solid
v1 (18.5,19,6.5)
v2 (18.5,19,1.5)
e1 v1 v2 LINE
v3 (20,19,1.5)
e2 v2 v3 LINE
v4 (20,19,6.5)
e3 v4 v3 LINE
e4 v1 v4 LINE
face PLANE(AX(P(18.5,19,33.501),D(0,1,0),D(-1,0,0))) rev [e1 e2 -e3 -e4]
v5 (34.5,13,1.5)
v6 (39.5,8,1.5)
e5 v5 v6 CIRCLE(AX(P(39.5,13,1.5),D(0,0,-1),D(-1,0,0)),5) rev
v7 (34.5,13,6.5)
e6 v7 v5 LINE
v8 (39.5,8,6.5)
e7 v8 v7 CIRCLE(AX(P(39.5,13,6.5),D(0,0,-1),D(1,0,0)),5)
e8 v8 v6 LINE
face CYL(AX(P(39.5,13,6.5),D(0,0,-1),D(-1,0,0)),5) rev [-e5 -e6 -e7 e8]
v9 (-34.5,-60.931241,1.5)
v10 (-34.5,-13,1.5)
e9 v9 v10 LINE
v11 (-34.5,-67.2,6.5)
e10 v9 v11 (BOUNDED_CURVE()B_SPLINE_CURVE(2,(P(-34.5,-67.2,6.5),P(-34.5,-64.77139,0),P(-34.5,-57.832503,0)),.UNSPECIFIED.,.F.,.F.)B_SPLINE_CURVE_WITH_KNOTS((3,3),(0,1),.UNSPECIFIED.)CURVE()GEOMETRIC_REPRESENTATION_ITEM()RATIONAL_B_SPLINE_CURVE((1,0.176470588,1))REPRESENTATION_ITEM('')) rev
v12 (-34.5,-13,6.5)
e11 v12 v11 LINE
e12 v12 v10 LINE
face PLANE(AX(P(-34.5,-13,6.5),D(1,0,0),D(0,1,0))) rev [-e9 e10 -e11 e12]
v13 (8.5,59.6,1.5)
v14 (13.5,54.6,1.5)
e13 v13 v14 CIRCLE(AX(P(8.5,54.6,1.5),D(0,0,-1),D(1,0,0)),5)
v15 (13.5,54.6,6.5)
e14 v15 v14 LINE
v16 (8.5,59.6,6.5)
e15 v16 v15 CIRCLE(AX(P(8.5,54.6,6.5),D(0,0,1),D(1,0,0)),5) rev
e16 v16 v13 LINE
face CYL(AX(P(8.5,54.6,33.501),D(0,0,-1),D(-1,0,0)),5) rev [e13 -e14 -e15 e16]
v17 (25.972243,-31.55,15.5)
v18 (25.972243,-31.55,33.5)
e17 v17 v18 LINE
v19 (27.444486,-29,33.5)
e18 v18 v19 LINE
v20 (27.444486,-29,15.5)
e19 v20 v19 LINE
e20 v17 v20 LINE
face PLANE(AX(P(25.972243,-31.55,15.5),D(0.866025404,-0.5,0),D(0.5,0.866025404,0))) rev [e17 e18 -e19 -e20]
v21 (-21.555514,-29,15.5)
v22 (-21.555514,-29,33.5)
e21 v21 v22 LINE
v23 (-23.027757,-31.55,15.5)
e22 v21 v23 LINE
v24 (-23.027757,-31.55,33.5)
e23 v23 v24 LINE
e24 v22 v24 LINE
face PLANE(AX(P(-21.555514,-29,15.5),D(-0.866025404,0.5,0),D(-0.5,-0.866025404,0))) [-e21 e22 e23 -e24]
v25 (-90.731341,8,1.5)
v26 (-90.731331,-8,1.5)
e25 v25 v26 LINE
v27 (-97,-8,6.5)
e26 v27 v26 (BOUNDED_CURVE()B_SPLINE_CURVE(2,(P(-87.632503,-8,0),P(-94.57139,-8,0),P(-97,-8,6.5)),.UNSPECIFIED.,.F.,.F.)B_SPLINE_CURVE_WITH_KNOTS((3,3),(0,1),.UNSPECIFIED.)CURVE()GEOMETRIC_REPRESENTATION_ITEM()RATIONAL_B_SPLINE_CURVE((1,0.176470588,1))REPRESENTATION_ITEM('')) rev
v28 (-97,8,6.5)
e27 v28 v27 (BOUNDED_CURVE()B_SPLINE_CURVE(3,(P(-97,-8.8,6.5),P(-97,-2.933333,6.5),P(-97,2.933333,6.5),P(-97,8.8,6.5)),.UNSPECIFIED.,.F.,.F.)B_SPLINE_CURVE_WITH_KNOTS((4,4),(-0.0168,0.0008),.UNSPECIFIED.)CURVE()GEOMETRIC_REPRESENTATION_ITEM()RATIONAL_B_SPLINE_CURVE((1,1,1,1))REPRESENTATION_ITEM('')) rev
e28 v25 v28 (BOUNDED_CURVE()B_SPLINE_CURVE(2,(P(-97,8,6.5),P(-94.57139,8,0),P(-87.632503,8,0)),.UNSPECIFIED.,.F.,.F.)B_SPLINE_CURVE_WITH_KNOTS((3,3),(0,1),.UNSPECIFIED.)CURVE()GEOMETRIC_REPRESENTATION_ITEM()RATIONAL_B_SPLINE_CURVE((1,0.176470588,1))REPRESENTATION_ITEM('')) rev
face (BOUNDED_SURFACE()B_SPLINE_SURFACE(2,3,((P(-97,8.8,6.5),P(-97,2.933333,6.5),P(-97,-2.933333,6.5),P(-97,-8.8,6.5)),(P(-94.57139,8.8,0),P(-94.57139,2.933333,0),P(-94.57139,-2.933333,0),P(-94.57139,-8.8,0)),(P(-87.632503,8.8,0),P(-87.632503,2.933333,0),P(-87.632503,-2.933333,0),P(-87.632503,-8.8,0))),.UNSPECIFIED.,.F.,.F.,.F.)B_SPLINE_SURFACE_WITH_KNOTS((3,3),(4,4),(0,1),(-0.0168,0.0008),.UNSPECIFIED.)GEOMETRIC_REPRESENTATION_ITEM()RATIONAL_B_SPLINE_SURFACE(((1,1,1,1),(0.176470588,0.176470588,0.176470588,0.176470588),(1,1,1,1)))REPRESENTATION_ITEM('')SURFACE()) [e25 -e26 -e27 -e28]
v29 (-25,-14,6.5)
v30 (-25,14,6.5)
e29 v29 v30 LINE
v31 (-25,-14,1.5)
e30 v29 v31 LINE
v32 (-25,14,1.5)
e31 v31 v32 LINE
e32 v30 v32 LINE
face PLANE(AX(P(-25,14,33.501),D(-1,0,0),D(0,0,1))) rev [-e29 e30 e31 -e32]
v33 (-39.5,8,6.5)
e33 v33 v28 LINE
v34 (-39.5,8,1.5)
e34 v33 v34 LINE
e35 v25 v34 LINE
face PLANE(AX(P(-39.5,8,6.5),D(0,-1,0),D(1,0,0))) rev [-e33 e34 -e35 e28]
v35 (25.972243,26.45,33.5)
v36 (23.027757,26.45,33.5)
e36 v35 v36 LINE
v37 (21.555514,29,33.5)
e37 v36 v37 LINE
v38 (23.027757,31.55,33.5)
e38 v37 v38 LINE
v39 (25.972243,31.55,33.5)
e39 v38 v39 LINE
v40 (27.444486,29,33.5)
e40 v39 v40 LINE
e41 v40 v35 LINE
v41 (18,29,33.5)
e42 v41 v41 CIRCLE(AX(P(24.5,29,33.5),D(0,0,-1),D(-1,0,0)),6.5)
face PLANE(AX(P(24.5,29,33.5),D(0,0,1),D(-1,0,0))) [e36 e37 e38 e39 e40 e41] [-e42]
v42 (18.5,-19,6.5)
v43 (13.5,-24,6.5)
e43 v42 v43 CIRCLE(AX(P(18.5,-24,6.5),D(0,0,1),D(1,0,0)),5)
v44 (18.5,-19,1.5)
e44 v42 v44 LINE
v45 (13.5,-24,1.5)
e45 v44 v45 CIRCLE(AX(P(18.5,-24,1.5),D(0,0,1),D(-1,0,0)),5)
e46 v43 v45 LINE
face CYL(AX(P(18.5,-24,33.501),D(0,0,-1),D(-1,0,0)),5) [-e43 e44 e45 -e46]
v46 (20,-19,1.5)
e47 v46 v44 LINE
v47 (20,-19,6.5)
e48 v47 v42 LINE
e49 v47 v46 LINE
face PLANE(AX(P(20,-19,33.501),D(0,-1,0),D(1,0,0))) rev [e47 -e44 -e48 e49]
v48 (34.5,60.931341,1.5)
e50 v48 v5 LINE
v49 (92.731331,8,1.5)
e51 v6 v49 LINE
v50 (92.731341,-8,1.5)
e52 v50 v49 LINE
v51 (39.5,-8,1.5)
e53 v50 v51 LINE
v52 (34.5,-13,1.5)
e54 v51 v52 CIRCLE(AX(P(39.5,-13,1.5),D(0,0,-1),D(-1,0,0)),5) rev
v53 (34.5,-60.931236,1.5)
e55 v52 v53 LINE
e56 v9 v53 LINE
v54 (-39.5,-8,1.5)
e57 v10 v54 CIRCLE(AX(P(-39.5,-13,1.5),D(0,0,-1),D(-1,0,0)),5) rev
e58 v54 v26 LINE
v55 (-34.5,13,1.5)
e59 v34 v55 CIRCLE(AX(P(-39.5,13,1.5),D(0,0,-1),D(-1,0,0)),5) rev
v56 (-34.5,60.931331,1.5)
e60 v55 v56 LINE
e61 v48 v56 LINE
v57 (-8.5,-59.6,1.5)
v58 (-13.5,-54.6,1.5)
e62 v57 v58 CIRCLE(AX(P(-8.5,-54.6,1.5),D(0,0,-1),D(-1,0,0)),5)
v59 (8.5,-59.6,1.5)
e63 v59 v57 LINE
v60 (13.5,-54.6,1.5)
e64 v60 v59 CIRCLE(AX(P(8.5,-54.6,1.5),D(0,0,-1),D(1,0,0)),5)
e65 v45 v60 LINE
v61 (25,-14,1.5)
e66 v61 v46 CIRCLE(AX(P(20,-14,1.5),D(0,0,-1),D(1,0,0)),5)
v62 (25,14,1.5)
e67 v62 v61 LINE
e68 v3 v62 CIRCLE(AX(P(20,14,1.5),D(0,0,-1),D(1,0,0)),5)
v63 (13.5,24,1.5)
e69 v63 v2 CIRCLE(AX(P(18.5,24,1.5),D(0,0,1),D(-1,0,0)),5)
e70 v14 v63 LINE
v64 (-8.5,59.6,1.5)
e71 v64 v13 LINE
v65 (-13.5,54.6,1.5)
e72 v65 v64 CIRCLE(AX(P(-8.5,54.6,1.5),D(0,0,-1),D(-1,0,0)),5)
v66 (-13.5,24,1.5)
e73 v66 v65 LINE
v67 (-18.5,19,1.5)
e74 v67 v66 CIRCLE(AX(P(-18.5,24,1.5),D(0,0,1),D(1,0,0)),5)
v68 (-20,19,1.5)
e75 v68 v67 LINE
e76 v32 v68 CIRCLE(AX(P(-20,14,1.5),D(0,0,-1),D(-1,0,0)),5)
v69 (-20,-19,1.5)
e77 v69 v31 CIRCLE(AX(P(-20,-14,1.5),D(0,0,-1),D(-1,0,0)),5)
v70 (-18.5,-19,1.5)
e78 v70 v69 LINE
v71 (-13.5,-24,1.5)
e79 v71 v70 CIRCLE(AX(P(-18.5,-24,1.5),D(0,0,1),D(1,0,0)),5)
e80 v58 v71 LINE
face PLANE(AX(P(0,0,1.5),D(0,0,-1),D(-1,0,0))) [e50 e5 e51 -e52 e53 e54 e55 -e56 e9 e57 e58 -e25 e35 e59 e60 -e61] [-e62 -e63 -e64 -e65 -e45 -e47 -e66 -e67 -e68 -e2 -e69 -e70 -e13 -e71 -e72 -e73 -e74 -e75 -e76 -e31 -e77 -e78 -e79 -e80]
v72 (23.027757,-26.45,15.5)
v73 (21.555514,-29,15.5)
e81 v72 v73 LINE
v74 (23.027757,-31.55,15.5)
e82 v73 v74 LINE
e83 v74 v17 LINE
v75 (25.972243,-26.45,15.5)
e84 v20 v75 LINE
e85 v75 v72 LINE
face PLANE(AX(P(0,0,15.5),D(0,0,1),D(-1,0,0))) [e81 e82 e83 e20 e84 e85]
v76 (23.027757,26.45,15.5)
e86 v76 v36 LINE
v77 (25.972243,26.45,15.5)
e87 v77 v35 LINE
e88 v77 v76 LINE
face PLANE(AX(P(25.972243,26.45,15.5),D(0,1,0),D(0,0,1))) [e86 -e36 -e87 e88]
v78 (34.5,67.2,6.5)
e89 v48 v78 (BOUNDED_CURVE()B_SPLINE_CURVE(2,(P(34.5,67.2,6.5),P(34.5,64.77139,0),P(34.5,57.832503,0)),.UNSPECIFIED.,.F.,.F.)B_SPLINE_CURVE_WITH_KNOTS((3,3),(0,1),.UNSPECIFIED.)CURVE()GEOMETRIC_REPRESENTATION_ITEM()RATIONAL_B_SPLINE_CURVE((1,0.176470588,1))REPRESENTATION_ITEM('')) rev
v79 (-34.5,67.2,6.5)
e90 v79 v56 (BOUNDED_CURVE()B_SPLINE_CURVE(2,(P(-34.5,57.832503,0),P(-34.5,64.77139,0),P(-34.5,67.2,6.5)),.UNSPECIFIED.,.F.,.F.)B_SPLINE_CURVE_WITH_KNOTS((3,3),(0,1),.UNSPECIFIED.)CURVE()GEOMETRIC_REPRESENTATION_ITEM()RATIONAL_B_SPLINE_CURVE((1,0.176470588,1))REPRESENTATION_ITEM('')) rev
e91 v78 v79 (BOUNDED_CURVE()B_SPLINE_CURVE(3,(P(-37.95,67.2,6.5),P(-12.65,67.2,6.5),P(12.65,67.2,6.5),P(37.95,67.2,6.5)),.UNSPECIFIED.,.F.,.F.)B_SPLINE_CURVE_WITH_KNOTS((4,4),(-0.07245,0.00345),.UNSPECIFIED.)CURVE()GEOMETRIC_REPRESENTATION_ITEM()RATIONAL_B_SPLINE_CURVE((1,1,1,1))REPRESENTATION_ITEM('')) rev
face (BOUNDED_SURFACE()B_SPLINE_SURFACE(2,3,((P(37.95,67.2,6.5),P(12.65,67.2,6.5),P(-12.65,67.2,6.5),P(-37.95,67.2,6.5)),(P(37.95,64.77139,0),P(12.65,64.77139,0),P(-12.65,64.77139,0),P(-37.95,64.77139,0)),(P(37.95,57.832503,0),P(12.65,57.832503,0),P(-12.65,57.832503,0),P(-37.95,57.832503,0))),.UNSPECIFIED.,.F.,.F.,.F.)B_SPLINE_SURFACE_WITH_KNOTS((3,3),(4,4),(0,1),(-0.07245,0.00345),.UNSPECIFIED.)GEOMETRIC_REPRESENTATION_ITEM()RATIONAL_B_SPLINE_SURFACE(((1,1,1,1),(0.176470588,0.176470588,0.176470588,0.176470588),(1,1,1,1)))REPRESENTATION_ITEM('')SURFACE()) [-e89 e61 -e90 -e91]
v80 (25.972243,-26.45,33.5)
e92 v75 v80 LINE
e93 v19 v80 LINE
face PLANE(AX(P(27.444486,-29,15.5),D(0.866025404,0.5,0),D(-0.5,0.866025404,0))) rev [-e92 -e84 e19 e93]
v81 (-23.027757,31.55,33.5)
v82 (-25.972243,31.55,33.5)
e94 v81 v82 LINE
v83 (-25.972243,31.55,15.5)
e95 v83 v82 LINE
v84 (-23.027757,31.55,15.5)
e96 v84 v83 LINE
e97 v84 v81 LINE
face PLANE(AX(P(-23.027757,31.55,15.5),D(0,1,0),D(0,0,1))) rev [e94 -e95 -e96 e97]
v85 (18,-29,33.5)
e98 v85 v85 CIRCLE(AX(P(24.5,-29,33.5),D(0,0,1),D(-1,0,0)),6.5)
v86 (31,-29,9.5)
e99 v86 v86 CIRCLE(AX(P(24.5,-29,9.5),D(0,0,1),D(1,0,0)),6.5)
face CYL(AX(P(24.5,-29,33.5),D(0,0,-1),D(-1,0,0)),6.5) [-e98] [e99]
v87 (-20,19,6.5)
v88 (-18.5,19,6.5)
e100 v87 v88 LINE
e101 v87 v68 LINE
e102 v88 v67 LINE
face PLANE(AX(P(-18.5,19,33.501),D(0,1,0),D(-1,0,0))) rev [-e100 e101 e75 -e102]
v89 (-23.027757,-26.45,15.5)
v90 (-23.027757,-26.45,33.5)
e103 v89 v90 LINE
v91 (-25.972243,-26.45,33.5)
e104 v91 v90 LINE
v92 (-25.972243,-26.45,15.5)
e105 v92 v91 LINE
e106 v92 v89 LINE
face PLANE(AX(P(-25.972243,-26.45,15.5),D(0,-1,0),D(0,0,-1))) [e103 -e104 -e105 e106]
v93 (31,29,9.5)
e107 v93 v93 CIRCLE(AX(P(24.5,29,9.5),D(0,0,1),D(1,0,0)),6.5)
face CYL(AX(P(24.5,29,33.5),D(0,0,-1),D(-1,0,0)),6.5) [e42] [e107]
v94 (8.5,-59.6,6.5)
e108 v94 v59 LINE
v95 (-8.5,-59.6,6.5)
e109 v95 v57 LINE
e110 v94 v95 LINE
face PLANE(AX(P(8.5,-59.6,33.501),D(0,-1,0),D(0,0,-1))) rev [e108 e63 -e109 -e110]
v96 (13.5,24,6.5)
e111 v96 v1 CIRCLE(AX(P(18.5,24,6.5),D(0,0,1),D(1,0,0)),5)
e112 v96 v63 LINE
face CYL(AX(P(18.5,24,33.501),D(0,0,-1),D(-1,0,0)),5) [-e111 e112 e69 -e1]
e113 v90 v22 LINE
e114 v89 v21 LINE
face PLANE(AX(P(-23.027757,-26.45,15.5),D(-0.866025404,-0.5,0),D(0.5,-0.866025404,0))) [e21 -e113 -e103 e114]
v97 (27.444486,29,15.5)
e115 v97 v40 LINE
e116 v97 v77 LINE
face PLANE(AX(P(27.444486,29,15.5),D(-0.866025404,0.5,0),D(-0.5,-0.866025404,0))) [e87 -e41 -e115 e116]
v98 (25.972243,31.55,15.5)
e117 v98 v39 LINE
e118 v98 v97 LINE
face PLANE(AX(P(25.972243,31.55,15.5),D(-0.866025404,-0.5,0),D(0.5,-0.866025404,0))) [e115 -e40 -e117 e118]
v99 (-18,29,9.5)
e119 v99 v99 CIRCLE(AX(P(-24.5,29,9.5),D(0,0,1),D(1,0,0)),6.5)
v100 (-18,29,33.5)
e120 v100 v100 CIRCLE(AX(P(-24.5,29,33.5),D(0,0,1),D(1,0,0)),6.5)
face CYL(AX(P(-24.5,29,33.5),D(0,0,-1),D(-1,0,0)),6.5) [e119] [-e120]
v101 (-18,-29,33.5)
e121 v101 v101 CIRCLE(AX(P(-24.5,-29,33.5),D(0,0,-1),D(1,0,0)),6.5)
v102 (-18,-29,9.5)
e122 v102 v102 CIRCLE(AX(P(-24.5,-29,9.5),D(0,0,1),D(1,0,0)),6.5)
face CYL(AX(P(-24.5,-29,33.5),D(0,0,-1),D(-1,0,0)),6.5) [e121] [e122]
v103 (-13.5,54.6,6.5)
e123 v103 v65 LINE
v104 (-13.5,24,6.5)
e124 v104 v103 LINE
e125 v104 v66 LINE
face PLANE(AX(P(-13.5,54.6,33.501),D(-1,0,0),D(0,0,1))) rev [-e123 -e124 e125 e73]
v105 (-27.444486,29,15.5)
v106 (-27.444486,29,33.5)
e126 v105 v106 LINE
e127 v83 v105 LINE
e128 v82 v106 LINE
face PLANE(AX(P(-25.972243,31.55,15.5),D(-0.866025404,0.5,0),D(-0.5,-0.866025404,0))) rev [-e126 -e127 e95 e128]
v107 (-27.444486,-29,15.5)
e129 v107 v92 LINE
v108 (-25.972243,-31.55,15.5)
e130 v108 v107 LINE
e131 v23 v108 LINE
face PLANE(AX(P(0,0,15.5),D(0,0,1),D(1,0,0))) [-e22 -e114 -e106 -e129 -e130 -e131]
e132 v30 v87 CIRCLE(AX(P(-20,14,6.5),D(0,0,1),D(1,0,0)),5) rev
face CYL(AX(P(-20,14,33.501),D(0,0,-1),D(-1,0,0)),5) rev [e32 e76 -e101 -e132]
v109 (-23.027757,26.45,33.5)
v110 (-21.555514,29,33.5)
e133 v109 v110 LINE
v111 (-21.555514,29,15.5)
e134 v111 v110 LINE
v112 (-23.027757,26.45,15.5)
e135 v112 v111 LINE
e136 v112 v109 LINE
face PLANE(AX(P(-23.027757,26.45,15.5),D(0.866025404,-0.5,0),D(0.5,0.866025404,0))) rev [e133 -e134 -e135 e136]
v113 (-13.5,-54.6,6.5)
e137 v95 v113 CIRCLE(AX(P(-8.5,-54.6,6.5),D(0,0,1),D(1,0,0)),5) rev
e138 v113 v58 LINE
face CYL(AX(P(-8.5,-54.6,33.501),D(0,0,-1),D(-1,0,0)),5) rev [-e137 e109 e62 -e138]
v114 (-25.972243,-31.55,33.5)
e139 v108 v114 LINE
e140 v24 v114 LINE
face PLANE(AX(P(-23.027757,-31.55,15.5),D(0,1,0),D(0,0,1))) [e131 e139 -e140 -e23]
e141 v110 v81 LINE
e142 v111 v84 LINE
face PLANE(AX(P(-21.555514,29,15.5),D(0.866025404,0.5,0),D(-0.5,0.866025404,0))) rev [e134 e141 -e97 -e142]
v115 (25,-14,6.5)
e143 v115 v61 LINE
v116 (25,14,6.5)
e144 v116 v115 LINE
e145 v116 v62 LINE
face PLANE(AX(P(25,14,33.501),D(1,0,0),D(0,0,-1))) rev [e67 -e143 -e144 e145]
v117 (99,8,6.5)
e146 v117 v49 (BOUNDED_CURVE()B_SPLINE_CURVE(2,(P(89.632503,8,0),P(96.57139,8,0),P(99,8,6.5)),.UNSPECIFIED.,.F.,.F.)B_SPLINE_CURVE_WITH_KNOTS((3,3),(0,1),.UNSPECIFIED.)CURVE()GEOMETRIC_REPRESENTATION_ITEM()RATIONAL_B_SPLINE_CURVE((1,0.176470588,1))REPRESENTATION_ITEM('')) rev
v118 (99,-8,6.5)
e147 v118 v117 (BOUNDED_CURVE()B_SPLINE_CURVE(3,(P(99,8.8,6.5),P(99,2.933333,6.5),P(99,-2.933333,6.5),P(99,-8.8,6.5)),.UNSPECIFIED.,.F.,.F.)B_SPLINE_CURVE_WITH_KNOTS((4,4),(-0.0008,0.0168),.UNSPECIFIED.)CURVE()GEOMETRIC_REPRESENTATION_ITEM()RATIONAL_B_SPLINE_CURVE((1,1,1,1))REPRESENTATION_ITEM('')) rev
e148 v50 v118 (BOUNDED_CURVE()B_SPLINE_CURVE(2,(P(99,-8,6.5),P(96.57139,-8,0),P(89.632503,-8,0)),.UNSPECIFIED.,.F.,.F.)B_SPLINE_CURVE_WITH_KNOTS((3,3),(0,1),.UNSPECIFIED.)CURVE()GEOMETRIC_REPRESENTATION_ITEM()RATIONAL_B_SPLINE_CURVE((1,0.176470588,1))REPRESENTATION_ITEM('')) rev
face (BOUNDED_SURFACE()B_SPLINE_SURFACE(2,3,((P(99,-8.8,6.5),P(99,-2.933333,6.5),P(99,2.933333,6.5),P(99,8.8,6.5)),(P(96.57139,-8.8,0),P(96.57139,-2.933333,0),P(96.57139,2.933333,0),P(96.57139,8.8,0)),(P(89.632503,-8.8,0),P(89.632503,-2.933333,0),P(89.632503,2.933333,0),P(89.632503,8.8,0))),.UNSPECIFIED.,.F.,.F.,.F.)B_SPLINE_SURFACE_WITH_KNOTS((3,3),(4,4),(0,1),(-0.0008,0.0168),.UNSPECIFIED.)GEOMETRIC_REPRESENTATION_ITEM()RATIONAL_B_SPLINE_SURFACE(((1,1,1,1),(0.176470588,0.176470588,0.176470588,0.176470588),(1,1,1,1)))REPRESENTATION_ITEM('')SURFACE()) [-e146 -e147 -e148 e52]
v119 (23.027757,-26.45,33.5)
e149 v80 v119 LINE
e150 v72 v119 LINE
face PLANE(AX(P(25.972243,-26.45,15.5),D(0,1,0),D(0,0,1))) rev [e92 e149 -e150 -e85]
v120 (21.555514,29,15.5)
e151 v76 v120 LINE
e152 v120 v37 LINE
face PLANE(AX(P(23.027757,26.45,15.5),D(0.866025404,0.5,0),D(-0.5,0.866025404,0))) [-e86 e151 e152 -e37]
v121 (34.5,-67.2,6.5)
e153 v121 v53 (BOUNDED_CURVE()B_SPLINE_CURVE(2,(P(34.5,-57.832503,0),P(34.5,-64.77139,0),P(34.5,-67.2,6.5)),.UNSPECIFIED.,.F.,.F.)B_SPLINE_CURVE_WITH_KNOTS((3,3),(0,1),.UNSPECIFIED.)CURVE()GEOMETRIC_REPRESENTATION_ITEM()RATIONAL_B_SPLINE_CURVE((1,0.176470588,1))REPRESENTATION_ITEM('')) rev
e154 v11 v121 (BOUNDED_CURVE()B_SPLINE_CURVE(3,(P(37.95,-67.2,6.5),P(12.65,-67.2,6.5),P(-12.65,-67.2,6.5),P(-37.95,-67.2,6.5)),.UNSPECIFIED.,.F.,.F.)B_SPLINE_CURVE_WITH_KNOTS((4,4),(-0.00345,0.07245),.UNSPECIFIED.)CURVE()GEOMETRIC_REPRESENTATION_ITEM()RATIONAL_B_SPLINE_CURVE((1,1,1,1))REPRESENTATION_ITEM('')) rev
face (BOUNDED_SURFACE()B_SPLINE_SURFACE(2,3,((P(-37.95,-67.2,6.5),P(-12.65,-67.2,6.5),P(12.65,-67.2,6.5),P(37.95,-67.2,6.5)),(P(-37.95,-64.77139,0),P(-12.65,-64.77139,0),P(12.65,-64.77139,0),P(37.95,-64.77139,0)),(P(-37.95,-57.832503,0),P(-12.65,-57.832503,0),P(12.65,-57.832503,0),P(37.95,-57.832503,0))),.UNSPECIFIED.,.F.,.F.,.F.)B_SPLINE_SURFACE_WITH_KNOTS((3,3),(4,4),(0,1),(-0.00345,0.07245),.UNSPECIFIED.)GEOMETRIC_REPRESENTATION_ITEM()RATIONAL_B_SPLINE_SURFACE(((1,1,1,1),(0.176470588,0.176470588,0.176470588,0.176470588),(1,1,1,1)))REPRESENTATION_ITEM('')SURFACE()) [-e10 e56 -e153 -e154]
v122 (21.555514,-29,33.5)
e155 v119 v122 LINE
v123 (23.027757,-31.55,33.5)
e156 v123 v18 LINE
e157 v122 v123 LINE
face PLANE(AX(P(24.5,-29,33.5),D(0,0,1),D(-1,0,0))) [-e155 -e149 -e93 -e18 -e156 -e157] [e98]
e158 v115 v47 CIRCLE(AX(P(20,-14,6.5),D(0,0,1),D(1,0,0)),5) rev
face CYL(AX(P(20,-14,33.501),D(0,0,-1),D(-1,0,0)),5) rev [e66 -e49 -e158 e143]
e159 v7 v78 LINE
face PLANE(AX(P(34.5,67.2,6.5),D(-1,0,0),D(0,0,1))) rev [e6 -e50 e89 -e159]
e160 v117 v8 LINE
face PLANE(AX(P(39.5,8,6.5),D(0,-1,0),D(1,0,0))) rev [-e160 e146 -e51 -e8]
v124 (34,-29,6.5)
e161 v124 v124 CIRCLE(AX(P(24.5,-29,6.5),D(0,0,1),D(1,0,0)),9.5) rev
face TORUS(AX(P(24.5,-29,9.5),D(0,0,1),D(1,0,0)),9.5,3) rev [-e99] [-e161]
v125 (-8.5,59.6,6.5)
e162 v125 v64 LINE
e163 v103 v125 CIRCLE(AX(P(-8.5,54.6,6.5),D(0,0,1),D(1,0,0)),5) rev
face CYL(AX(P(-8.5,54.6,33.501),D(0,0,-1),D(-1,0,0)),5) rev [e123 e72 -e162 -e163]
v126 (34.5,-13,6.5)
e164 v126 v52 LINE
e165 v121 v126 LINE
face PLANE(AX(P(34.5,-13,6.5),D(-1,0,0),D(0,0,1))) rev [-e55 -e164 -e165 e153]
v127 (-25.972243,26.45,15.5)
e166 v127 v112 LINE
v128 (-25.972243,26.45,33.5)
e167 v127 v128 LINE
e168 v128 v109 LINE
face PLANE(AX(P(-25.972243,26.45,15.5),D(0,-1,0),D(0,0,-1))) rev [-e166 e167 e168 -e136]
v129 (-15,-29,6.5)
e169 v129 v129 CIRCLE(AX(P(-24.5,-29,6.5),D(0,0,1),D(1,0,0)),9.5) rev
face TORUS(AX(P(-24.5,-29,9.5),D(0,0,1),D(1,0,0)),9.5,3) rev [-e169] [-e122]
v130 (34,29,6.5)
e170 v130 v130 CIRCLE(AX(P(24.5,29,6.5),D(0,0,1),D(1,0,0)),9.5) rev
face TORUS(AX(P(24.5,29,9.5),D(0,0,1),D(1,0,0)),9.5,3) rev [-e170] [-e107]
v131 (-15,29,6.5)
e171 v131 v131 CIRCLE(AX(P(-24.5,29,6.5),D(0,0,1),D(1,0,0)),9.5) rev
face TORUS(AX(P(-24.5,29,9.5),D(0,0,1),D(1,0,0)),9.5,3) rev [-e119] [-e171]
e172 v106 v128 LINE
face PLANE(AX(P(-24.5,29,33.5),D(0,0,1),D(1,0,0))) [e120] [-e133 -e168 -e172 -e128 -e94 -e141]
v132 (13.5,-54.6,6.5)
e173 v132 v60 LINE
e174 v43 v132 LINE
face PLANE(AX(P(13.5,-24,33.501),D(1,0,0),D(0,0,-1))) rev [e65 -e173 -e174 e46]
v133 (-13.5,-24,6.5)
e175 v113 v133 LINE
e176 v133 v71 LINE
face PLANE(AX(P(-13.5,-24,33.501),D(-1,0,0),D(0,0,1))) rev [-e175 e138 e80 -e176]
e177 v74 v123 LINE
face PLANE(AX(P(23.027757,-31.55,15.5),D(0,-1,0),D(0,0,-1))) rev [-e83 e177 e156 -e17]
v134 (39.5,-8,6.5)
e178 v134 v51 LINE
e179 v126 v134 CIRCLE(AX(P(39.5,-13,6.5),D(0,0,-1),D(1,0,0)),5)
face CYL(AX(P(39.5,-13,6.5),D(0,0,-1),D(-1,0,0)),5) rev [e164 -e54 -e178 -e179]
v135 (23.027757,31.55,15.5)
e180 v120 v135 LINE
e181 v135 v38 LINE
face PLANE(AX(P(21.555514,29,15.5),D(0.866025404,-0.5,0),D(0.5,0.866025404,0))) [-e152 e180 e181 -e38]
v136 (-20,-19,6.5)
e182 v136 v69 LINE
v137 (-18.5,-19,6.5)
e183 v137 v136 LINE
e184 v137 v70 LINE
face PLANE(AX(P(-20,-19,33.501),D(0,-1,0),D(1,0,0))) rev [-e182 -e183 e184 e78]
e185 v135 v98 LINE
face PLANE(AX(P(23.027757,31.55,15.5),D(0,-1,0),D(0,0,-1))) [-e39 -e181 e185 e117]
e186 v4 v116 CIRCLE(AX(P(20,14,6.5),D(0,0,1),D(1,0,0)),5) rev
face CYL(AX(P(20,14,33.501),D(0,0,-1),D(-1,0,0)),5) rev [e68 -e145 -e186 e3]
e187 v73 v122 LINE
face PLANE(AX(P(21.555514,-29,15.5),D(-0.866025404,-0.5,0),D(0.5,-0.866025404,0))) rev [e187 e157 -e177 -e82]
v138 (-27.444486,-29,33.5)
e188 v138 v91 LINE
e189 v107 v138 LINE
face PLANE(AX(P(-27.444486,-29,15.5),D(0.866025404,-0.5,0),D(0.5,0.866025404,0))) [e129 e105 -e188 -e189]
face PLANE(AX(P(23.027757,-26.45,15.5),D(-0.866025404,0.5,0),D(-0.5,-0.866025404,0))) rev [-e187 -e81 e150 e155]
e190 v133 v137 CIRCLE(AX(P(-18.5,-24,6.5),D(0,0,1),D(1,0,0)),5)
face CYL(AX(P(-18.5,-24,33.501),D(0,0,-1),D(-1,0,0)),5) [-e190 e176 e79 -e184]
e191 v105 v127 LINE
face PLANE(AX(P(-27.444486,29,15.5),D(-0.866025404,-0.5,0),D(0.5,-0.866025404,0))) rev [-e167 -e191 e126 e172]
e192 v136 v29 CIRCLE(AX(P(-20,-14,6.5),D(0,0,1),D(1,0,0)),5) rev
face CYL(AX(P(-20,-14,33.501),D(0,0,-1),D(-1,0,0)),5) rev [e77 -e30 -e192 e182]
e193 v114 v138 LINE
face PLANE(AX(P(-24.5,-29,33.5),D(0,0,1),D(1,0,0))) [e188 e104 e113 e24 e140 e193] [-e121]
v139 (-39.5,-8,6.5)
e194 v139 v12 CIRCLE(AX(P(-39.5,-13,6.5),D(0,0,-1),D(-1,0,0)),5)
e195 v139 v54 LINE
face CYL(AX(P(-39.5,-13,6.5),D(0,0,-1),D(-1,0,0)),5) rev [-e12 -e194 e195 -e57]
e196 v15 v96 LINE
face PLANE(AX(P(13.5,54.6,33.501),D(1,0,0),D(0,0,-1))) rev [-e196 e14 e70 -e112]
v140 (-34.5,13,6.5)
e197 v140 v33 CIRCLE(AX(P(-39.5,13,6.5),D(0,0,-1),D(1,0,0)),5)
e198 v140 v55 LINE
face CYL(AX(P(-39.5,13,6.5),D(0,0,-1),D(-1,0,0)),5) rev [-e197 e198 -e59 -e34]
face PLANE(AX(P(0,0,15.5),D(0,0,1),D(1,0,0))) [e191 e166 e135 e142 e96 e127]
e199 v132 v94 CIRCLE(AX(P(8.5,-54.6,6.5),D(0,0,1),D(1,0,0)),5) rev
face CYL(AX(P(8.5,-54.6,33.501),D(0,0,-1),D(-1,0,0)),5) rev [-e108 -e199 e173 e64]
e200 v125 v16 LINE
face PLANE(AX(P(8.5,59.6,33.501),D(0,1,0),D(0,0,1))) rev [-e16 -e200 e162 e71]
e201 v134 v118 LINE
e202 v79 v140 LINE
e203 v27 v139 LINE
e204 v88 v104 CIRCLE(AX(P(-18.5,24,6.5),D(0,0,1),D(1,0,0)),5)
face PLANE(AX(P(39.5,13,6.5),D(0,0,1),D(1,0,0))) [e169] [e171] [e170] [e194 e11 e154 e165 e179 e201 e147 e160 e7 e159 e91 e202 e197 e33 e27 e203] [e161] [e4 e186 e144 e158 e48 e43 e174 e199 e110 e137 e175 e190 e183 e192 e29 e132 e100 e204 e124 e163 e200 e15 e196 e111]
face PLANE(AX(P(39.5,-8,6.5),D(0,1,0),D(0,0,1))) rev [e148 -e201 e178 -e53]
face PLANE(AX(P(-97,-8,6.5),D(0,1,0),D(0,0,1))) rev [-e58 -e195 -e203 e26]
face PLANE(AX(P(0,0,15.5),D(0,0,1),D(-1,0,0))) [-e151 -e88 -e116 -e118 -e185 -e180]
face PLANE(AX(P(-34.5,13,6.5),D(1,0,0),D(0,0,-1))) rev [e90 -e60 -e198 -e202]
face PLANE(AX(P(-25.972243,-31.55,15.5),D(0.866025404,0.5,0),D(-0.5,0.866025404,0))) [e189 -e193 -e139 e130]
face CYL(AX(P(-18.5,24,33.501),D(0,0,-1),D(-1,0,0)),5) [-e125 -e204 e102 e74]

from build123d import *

# Parameters (mm, degrees)
BOSS_EXTRUDE1_DEPTH = 6.5
FILLET4_START       = -8
FILLET4_DEPTH       = 16
FILLET4_START_2     = -34.5
FILLET4_2_DEPTH     = 69
SKETCH4_W           = 251.095983112
SKETCH4_H           = 149.113377468
CUT_EXTRUDE2_DEPTH  = 1.5
SKETCH6_R           = 6.5
BOSS_EXTRUDE3_DEPTH = 27
FILLET3_R           = 3
CUT_EXTRUDE3_DEPTH  = 18
MIRROR1_START       = 6.5
MIRROR1_OUTLINE_R   = 6.5
MIRROR1_DEPTH       = 27
MIRROR1_2_DEPTH     = 9
CUT_EXTRUDE6_REACH  = 125.858


with BuildPart() as part:
    # Sketch1 → Boss-Extrude1 (new body)
    with BuildSketch(Plane.XY):
        with BuildLine():
            Line((34.5, -13), (34.5, -67.2))
            Line((34.5, -67.2), (-34.5, -67.2))
            Line((-34.5, -67.2), (-34.5, -13))
            ThreePointArc((-34.5, -13), (-35.964466094, -9.464466094), (-39.5, -8))
            Line((-39.5, -8), (-97, -8))
            Line((-97, -8), (-97, 8))
            Line((-97, 8), (-39.5, 8))
            ThreePointArc((-39.5, 8), (-35.964466094, 9.464466094), (-34.5, 13))
            Line((-34.5, 13), (-34.5, 67.2))
            Line((-34.5, 67.2), (34.5, 67.2))
            Line((34.5, 67.2), (34.5, 13))
            ThreePointArc((34.5, 13), (35.964466094, 9.464466094), (39.5, 8))
            Line((39.5, 8), (83.5, 8))
            Line((83.5, 8), (99, 8))
            Line((99, 8), (99, -8))
            Line((99, -8), (39.5, -8))
            ThreePointArc((39.5, -8), (35.964466094, -9.464466094), (34.5, -13))
        make_face()
    extrude(amount=BOSS_EXTRUDE1_DEPTH)

    # Fillet4: read off the stored shape, not the designer's step
    # Fillet4 outline → Fillet4 (cut)
    with BuildSketch(Plane(origin=(0, 0, 0), x_dir=(1, 0, 0), z_dir=(0, 1, 0)).offset(FILLET4_START)):
        with BuildLine():
            add(Edge.make_bspline(
                [(-97, -6.5), (-94.571389667, 0), (-87.632503002, 0)],
                knots=[0, 0, 0, 1, 1, 1], degree=2, weights=[1, 0.176470588, 1]))
            Line((-87.632503002, 0), (-97, 0))
            Line((-97, 0), (-97, -6.5))
        make_face()
        with BuildLine():
            add(Edge.make_bspline(
                [(99, -6.5), (96.571389667, 0), (89.632503002, 0)],
                knots=[0, 0, 0, 1, 1, 1], degree=2, weights=[1, 0.176470588, 1]))
            Line((99, -6.5), (99, 0))
            Line((99, 0), (89.632503002, 0))
        make_face()
    extrude(amount=FILLET4_DEPTH, mode=Mode.SUBTRACT)

    # Fillet4 2 outline → Fillet4 2 (cut)
    with BuildSketch(Plane.YZ.offset(FILLET4_START_2)):
        with BuildLine():
            Line((67.2, 0), (67.2, 6.5))
            add(Edge.make_bspline(
                [(67.2, 6.5), (64.771389667, 0), (57.832503002, 0)],
                knots=[0, 0, 0, 1, 1, 1], degree=2, weights=[1, 0.176470588, 1]))
            Line((57.832503002, 0), (67.2, 0))
        make_face()
        with BuildLine():
            Line((-67.2, 0), (-57.832503002, 0))
            add(Edge.make_bspline(
                [(-67.2, 6.5), (-64.771389667, 0), (-57.832503002, 0)],
                knots=[0, 0, 0, 1, 1, 1], degree=2, weights=[1, 0.176470588, 1]))
            Line((-67.2, 6.5), (-67.2, 0))
        make_face()
    extrude(amount=FILLET4_2_DEPTH, mode=Mode.SUBTRACT)

    # Sketch4 → Cut-Extrude2 (cut)
    with BuildSketch(Plane.XY):
        Rectangle(SKETCH4_W, SKETCH4_H)
    extrude(amount=CUT_EXTRUDE2_DEPTH, mode=Mode.SUBTRACT)

    # Sketch6 → Boss-Extrude3 (add)
    with BuildSketch(Plane.XY.offset(6.5)):
        with Locations((-24.5, 29)):
            Circle(SKETCH6_R)
    extrude(amount=BOSS_EXTRUDE3_DEPTH)

    # Fillet3
    fillet3_edges = [part.edges().sort_by_distance(p)[0] for p in [
        (-31, 29, 6.5),
    ]]
    fillet(fillet3_edges, radius=FILLET3_R)

    # Sketch7 → Cut-Extrude3 (cut)
    with BuildSketch(Plane.XY.offset(33.5)):
        Polygon((-27.444486373, 29), (-25.972243186, 26.45), (-23.027756814, 26.45), (-21.555513627, 29), (-23.027756814, 31.55), (-25.972243186, 31.55), align=None)
    extrude(amount=-CUT_EXTRUDE3_DEPTH, mode=Mode.SUBTRACT)

    # Mirror1: read off the stored shape, not the designer's step
    # Mirror1 outline → Mirror1 (add)
    # profile 1 of 3: a face of its own
    with BuildSketch(Plane.XY.offset(MIRROR1_START)):
        with Locations((24.5, 29)):
            Circle(MIRROR1_OUTLINE_R)
        Polygon((21.555513627, 29), (23.027756814, 31.55), (25.972243186, 31.55), (27.444486373, 29), (25.972243186, 26.45), (23.027756814, 26.45), align=None, mode=Mode.SUBTRACT)
    # profile 2 of 3: a face of its own
    with BuildSketch(Plane.XY.offset(MIRROR1_START)):
        with Locations((-24.5, -29)):
            Circle(MIRROR1_OUTLINE_R)
        Polygon((-23.027756814, -31.55), (-25.972243186, -31.55), (-27.444486373, -29), (-25.972243186, -26.45), (-23.027756814, -26.45), (-21.555513627, -29), align=None, mode=Mode.SUBTRACT)
    # profile 3 of 3: a face of its own
    with BuildSketch(Plane.XY.offset(MIRROR1_START)):
        with Locations((24.5, -29)):
            Circle(MIRROR1_OUTLINE_R)
        Polygon((23.027756814, -26.45), (25.972243186, -26.45), (27.444486373, -29), (25.972243186, -31.55), (23.027756814, -31.55), (21.555513627, -29), align=None, mode=Mode.SUBTRACT)
    extrude(amount=MIRROR1_DEPTH)

    # Mirror1 2 outline → Mirror1 2 (add)
    with BuildSketch(Plane.XY.offset(MIRROR1_START)):
        Polygon((25.972243186, 31.55), (23.027756814, 31.55), (21.555513627, 29), (23.027756814, 26.45), (25.972243186, 26.45), (27.444486373, 29), align=None)
        Polygon((-27.444486373, -29), (-25.972243186, -31.55), (-23.027756814, -31.55), (-21.555513627, -29), (-23.027756814, -26.45), (-25.972243186, -26.45), align=None)
        Polygon((27.444486373, -29), (25.972243186, -26.45), (23.027756814, -26.45), (21.555513627, -29), (23.027756814, -31.55), (25.972243186, -31.55), align=None)
    extrude(amount=MIRROR1_2_DEPTH)

    # Mirror1 3 outline → Mirror1 3 (revolve)
    with BuildSketch(Plane(origin=(24.5, 29, 0), x_dir=(1, 0, 0), z_dir=(0, -1, 0))):
        with BuildLine():
            ThreePointArc((9.5, 6.5), (7.378679656, 7.378679656), (6.5, 9.5))
            Line((6.5, 9.5), (6.5, 6.5))
            Line((6.5, 6.5), (9.5, 6.5))
        make_face()
    revolve(axis=Axis((24.5, 29, 0), (0, 0, 1)))

    # Mirror1 4 outline → Mirror1 4 (revolve)
    with BuildSketch(Plane(origin=(-24.5, -29, 0), x_dir=(1, 0, 0), z_dir=(0, -1, 0))):
        with BuildLine():
            ThreePointArc((9.5, 6.5), (7.378679656, 7.378679656), (6.5, 9.5))
            Line((6.5, 9.5), (6.5, 6.5))
            Line((6.5, 6.5), (9.5, 6.5))
        make_face()
    revolve(axis=Axis((-24.5, -29, 0), (0, 0, 1)))

    # Mirror1 5 outline → Mirror1 5 (revolve)
    with BuildSketch(Plane(origin=(24.5, -29, 0), x_dir=(1, 0, 0), z_dir=(0, -1, 0))):
        with BuildLine():
            ThreePointArc((9.5, 6.5), (7.378679656, 7.378679656), (6.5, 9.5))
            Line((6.5, 9.5), (6.5, 6.5))
            Line((6.5, 6.5), (9.5, 6.5))
        make_face()
    revolve(axis=Axis((24.5, -29, 0), (0, 0, 1)))

    # Sketch13 → Cut-Extrude6 (cut, up to next)
    with BuildSketch(Plane(origin=(0, 0, 1.5), x_dir=(-1, 0, 0), z_dir=(0, 0, -1)), mode=Mode.PRIVATE) as cut_extrude6_sk1:
        with BuildLine():
            Line((-13.5, 54.6), (-13.5, 24))
            ThreePointArc((-13.5, 24), (-14.964466094, 20.464466094), (-18.5, 19))
            Line((-18.5, 19), (-20, 19))
            ThreePointArc((-20, 19), (-23.535533906, 17.535533906), (-25, 14))
            Line((-25, 14), (-25, -14))
            ThreePointArc((-25, -14), (-23.535533906, -17.535533906), (-20, -19))
            Line((-20, -19), (-18.5, -19))
            ThreePointArc((-18.5, -19), (-14.964466094, -20.464466094), (-13.5, -24))
            Line((-13.5, -24), (-13.5, -54.6))
            ThreePointArc((-13.5, -54.6), (-12.035533906, -58.135533906), (-8.5, -59.6))
            Line((-8.5, -59.6), (8.5, -59.6))
            ThreePointArc((8.5, -59.6), (12.035533906, -58.135533906), (13.5, -54.6))
            Line((13.5, -54.6), (13.5, -24))
            ThreePointArc((13.5, -24), (14.964466094, -20.464466094), (18.5, -19))
            Line((18.5, -19), (20, -19))
            ThreePointArc((20, -19), (23.535533906, -17.535533906), (25, -14))
            Line((25, -14), (25, 14))
            ThreePointArc((25, 14), (23.535533906, 17.535533906), (20, 19))
            Line((20, 19), (18.5, 19))
            ThreePointArc((18.5, 19), (14.964466094, 20.464466094), (13.5, 24))
            Line((13.5, 24), (13.5, 54.6))
            ThreePointArc((13.5, 54.6), (12.035533906, 58.135533906), (8.5, 59.6))
            Line((8.5, 59.6), (-8.5, 59.6))
            ThreePointArc((-8.5, 59.6), (-12.035533906, 58.135533906), (-13.5, 54.6))
        make_face()
    cut_extrude6_tool1 = extrude(cut_extrude6_sk1.sketch, amount=-CUT_EXTRUDE6_REACH, mode=Mode.PRIVATE) & part.part
    add(cut_extrude6_tool1.solids().sort_by_distance((0, 0, 1.5))[0], mode=Mode.SUBTRACT)


solid = part.part
